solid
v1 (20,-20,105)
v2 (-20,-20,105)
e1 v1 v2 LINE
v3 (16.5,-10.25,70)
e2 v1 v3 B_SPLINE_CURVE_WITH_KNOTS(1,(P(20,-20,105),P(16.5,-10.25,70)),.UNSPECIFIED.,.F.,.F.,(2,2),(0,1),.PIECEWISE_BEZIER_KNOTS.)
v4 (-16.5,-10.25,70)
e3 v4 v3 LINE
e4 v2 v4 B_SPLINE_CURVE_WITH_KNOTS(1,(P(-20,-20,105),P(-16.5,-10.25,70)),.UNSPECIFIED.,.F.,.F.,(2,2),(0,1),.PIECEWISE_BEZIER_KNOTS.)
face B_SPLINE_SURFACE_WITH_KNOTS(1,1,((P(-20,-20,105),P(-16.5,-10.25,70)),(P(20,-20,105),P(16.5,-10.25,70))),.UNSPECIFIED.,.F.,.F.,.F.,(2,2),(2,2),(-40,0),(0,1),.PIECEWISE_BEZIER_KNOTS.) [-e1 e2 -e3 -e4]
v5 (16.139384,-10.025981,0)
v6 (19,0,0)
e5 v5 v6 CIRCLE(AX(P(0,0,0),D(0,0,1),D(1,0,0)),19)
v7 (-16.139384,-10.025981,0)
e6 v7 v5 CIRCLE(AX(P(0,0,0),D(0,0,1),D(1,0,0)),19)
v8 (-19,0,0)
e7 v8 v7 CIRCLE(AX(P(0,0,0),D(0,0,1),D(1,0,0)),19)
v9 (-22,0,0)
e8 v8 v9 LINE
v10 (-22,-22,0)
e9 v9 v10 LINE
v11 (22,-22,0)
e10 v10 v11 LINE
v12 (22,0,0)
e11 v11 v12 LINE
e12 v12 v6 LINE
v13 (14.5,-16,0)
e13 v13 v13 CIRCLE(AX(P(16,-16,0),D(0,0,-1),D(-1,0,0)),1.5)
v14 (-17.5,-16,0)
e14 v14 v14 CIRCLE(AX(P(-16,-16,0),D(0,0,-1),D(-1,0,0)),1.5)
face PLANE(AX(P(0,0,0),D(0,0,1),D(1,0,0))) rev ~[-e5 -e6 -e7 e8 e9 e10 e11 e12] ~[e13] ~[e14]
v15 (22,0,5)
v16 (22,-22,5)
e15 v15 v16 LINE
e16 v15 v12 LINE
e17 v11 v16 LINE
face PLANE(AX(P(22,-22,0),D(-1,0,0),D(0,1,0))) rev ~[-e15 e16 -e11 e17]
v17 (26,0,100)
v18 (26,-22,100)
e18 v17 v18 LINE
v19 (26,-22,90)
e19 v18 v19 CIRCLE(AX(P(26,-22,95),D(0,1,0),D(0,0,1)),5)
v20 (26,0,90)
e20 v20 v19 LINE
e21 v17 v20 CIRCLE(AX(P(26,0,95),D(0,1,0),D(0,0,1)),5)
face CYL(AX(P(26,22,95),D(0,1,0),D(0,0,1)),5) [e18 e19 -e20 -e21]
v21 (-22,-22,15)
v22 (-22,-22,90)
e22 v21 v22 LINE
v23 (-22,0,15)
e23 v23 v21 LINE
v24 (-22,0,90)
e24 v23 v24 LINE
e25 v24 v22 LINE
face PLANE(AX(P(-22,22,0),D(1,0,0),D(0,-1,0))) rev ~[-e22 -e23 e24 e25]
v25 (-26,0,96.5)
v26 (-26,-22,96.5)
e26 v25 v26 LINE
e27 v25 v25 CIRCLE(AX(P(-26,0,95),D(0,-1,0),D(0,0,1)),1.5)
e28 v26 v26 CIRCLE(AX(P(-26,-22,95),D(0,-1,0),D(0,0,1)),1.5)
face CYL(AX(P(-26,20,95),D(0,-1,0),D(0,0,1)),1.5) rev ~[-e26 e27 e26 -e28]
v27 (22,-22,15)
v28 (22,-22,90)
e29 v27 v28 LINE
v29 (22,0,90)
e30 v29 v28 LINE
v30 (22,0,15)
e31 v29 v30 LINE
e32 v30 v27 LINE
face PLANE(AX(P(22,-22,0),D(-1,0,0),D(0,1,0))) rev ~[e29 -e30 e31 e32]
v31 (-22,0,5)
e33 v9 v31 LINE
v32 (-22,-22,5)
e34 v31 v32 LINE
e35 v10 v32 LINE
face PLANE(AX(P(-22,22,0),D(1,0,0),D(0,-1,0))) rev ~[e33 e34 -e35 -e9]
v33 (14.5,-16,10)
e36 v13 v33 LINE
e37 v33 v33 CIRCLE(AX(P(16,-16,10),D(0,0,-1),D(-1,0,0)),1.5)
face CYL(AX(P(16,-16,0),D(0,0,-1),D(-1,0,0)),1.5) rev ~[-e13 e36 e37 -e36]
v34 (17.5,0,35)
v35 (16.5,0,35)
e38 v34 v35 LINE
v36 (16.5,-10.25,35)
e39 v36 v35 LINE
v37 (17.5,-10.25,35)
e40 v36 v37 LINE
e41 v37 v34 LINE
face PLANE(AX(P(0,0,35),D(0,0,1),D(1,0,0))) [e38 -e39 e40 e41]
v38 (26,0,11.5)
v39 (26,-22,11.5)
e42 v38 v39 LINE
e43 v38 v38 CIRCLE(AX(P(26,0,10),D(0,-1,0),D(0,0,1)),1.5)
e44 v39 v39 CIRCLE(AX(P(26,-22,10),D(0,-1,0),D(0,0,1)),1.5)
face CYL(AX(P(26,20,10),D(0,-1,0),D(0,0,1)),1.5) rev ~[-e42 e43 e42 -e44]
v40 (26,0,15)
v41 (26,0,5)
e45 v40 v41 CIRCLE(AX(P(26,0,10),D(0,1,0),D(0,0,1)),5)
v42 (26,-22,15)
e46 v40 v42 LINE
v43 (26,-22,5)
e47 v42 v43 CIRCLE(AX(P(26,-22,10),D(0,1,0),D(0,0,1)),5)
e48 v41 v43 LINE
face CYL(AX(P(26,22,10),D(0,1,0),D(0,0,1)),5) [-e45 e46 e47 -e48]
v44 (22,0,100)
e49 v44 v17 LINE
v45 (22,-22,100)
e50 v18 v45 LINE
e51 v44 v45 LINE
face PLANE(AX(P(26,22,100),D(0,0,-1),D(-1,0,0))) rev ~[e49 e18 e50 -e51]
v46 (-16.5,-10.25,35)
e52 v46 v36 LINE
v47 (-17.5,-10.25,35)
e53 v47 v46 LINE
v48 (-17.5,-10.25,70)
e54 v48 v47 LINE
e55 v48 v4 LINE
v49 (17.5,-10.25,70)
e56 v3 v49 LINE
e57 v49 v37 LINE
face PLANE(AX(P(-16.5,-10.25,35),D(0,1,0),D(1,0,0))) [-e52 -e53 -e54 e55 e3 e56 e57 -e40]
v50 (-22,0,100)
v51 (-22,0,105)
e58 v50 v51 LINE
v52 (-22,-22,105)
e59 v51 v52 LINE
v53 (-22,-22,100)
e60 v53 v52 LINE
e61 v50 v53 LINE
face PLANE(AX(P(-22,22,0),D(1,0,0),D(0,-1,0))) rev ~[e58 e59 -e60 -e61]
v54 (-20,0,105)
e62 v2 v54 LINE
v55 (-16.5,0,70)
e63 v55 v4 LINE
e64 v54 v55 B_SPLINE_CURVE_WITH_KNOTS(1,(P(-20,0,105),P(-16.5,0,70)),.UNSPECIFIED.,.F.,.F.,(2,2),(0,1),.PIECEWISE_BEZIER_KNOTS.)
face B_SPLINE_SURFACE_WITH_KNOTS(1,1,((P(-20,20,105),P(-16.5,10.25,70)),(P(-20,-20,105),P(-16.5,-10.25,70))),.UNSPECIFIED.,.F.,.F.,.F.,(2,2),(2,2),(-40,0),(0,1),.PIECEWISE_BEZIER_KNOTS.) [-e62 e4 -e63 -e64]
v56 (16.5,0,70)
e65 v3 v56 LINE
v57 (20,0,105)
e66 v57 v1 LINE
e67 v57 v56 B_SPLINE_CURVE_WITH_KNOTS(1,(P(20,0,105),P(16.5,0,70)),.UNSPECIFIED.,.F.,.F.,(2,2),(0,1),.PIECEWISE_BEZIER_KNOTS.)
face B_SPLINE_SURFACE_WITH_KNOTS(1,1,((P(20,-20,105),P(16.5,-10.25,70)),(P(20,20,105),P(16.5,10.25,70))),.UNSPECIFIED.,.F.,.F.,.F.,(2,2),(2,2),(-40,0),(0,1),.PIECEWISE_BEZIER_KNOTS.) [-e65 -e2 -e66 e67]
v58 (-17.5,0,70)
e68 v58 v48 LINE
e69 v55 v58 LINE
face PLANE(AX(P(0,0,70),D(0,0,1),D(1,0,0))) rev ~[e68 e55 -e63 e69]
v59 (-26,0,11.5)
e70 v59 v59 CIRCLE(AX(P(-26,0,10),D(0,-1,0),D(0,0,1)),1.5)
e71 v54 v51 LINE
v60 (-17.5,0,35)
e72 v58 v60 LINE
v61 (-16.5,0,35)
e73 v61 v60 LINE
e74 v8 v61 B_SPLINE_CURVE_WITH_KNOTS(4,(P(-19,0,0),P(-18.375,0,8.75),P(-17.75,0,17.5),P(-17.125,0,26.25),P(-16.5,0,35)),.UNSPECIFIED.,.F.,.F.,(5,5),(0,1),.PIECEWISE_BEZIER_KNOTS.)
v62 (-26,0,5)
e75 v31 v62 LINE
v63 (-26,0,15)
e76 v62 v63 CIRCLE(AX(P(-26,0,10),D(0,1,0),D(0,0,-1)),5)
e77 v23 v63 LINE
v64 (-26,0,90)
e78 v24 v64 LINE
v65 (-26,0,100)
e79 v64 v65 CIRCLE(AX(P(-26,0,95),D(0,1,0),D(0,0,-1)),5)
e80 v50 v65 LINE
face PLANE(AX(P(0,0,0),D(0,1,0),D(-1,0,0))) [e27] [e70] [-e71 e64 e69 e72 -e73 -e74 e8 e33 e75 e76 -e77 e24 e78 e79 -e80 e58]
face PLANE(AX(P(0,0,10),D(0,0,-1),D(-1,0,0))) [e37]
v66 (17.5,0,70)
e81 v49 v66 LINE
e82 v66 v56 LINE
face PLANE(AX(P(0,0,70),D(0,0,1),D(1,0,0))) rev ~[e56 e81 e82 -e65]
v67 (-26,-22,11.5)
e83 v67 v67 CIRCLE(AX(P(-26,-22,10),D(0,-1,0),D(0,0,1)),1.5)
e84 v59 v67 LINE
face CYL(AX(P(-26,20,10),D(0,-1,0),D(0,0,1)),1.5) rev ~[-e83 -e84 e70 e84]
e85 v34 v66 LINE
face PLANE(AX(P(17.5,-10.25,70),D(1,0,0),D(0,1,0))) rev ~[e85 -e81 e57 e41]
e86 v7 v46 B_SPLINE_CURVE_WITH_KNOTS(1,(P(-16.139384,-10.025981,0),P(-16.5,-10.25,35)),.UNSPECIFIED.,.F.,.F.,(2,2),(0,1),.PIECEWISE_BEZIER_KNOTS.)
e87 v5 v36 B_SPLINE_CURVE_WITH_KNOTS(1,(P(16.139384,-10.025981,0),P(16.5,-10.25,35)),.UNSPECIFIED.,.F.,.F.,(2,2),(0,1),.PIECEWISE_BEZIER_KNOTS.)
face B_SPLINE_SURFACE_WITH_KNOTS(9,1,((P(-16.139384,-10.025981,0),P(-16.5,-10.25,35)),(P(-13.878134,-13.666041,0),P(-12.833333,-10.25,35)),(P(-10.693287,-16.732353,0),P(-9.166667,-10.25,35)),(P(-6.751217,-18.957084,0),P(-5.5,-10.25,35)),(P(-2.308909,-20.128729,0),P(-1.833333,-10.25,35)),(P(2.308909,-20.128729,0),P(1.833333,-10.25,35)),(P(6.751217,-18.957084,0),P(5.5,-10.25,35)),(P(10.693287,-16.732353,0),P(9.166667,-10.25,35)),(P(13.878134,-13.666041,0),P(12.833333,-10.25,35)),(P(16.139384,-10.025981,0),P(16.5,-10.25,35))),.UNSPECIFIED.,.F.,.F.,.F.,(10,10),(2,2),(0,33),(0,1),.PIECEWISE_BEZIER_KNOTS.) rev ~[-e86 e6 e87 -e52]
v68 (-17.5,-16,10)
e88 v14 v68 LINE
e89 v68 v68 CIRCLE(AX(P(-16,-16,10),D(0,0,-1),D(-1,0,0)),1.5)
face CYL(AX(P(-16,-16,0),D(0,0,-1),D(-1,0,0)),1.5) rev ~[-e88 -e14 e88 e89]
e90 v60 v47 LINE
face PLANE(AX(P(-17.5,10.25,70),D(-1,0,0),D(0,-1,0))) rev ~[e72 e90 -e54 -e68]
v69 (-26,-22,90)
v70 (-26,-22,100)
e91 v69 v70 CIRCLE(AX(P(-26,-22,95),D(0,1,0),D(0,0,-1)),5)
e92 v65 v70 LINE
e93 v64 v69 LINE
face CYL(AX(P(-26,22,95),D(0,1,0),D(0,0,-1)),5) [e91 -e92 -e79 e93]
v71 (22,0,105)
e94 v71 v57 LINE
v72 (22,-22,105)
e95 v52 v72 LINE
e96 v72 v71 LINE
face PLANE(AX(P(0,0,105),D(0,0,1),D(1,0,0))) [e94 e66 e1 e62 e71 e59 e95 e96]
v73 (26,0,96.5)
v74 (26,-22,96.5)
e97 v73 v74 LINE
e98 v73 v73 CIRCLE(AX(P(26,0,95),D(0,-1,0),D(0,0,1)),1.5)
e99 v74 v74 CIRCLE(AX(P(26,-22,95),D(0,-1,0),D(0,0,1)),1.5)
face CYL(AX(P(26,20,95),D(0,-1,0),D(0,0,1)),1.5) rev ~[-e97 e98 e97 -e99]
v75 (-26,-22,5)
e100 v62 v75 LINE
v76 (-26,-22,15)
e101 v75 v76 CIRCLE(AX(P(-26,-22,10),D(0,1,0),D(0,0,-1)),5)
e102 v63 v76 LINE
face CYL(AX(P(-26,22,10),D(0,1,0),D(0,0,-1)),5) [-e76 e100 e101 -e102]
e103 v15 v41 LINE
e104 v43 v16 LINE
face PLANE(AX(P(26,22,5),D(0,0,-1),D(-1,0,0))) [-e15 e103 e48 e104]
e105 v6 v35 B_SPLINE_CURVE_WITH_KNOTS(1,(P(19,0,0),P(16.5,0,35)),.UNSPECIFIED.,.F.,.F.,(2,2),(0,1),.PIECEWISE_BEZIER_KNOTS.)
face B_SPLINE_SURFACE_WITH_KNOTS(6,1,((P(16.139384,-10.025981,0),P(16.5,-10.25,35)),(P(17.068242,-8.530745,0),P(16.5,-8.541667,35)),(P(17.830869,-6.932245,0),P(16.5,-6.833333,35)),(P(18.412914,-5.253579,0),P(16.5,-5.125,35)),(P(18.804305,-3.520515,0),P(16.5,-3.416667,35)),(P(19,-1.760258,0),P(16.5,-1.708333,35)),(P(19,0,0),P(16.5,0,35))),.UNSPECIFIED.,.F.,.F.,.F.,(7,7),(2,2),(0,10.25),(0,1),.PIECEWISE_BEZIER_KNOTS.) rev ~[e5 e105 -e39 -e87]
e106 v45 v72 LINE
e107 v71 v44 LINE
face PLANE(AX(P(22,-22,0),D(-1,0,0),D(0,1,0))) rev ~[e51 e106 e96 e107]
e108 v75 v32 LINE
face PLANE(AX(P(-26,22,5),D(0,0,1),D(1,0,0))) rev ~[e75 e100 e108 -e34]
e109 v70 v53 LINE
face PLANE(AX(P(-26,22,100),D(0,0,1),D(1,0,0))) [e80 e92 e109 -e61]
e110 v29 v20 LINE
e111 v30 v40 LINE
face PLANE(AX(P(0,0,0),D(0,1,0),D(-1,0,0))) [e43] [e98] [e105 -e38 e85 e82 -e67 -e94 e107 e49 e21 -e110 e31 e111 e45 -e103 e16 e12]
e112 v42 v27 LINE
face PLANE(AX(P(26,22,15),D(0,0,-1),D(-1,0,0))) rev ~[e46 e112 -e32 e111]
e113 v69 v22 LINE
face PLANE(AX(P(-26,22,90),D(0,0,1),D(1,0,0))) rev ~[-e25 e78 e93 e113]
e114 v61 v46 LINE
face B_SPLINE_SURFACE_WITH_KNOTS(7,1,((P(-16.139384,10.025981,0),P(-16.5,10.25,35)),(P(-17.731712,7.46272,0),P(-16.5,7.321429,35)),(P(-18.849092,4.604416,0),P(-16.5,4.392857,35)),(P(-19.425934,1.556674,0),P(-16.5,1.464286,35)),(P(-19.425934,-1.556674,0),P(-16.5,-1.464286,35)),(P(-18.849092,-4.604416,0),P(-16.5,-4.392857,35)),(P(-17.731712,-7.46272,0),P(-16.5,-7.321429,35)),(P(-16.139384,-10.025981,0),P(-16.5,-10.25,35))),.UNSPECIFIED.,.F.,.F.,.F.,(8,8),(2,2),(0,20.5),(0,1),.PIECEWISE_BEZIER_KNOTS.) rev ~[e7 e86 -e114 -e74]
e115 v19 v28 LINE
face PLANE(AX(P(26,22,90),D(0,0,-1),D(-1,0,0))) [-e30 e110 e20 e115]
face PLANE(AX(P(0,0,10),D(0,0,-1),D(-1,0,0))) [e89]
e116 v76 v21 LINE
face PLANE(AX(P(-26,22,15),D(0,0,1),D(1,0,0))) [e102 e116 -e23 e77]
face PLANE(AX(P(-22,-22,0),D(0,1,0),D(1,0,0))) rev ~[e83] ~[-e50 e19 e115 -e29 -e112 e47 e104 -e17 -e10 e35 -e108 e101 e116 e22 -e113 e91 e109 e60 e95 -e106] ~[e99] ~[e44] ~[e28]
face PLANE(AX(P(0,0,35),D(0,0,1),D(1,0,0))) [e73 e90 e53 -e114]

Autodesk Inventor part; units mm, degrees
ref_plane "YZ Plane" through (0, 0, 0) normal (1, 0, 0) x (0, 1, 0)
ref_plane "XZ Plane" through (0, 0, 0) normal (0, 1, 0) x (-1, 0, 0)
ref_plane "Płaszczyzna konstrukcyjna3" through (0, 0, 35) normal (0, 0, 1) x (1, 0, 0)
ref_plane "Płaszczyzna konstrukcyjna4" through (0, 0, 70) normal (0, 0, 1) x (1, 0, 0)
ref_plane "Płaszczyzna konstrukcyjna5" through (0, 0, 105) normal (0, 0, 1) x (1, 0, 0)
sketch "Szkic7" plane through (0, 0, 0) normal (0, 0, 1) x (1, 0, 0)
  circle A0 centre (0, 0) radius 19
  dimension "d41" = 38
sketch "Szkic9" plane through (0, 0, 35) normal (0, 0, 1) x (1, 0, 0)
  line L0 (16.5, 10.25) -> (-16.5, 10.25)
  line L1 (-16.5, 10.25) -> (-16.5, -10.25)
  line L2 (-16.5, -10.25) -> (16.5, -10.25)
  line L3 (16.5, -10.25) -> (16.5, 10.25)
  line L4 (16.5, 10.25) -> (-16.5, -10.25) construction
  line L5 (-16.5, 10.25) -> (16.5, -10.25) construction
  point P0 (0, 0)
  dimension "d42" = 33
  dimension "d43" = 20.5
sketch "Szkic10" plane through (0, 0, 70) normal (0, 0, 1) x (1, 0, 0)
  line L0 (16.5, 10.25) -> (-16.5, 10.25) projected
  line L1 (-16.5, 10.25) -> (-16.5, -10.25) projected
  line L2 (-16.5, -10.25) -> (16.5, -10.25) projected
  line L3 (16.5, -10.25) -> (16.5, 10.25) projected
  point P0 (0, 0)
sketch "Szkic11" plane through (0, 0, 105) normal (0, 0, 1) x (1, 0, 0)
  line L0 (20, -20) -> (-20, -20)
  line L1 (-20, -20) -> (-20, 20)
  line L2 (-20, 20) -> (20, 20)
  line L3 (20, 20) -> (20, -20)
  line L4 (20, -20) -> (-20, 20) construction
  line L5 (-20, -20) -> (20, 20) construction
  point P0 (0, 0)
  dimension "d44" = 40
  dimension "d45" = 40
sketch "Szkic12" plane through (0, 0, 0) normal (0, 0, 1) x (1, 0, 0)
  line L0 (-22, -22) -> (22, -22)
  line L1 (22, -22) -> (22, 22)
  line L2 (22, 22) -> (-22, 22)
  line L3 (-22, 22) -> (-22, -22)
  line L4 (-22, -22) -> (22, 22) construction
  line L5 (22, -22) -> (-22, 22) construction
  point P0 (0, 0)
  dimension "d46" = 44
  dimension "d47" = 44
extrude "Wyciągnięcie proste1" add sketch "Szkic12" along normal blind 105
extrude "Wyciągnięcie proste2" cut sketch "Szkic9" along normal blind 35
loft "Wyciągnięcie złożone1" cut profiles "Szkic7" section 2 edges at (-16.5, 0, 35) (0, -10.25, 35) (16.5, 0, 35) (0, 10.25, 35)
loft "Wyciągnięcie złożone2" cut profiles "Szkic11" section 2 edges at (-16.5, 0, 70) (0, 10.25, 70) (16.5, 0, 70) (0, -10.25, 70)
sketch "Szkic13" plane through (0, 0, 70) normal (0, 0, 1) x (1, 0, 0)
  line L0 (-17.5, -10.25) -> (17.5, -10.25)
  line L1 (17.5, -10.25) -> (17.5, 10.25)
  line L2 (17.5, 10.25) -> (-17.5, 10.25)
  line L3 (-17.5, 10.25) -> (-17.5, -10.25)
  line L4 (-17.5, -10.25) -> (17.5, 10.25) construction
  line L5 (17.5, -10.25) -> (-17.5, 10.25) construction
  point P0 (0, 0)
  dimension "d60" = 35
  dimension "d61" = 20.5
extrude "Wyciągnięcie proste3" cut sketch "Szkic13" against normal blind 35
sketch "Szkic14" plane through (-22, 22, 0) normal (0, 1, 0) x (1, 0, 0)
  point P0 (22, 0)
sketch "Szkic15" plane through (-16.2734, 10.25, 35) normal (0, -1, 0) x (1, 0, 0)
  line L0 (32.5467, 0) -> (0, 0) construction
  line L1 (16.2734, 0) -> (16.2734, -12) construction
  circle A0 centre (16.2734, -12) radius 4
  point P0 (16.2734, -35)
  dimension "d64" = 12
  dimension "d65" = 8
extrude "Wyciągnięcie proste4" cut sketch "Szkic15" against normal through all
sketch "Szkic16" plane through (0, 0, 0) normal (0, 0, -1) x (-1, 0, 0)
  line L0 (-16, -16) -> (16, -16) construction
  line L1 (16, -16) -> (16, 16) construction
  line L2 (16, 16) -> (-16, 16) construction
  line L3 (-16, 16) -> (-16, -16) construction
  line L4 (-16, -16) -> (16, 16) construction
  line L5 (16, -16) -> (-16, 16) construction
  circle A0 centre (-16, 16) radius 1.5
  circle A1 centre (-16, -16) radius 1.5
  circle A2 centre (16, -16) radius 1.5
  circle A3 centre (16, 16) radius 1.5
  point P0 (0, 0)
  dimension "d68" = 32
  dimension "d69" = 32
  dimension "d70" = 3
extrude "Wyciągnięcie proste5" cut sketch "Szkic16" against normal blind 10
sketch "Szkic17" plane through (0, 0, 0) normal (0, 1, 0) x (-1, 0, 0)
  line L0 (-35.497, 120.9522) -> (40.1676, 120.9522)
  line L1 (40.1676, 120.9522) -> (40.1676, -13.5628)
  line L2 (40.1676, -13.5628) -> (-35.497, -13.5628)
  line L3 (-35.497, -13.5628) -> (-35.497, 120.9522)
  point P0 (0, 0)
sketch "Szkic18" plane through (-22, 22, 0) normal (0, 1, 0) x (1, 0, 0)
  point P0 (22, 0)
sketch "Szkic19" plane through (-22, 22, 0) normal (0, 1, 0) x (1, 0, 0)
  line L0 (44, 0) -> (44, -105) projected
  line L1 (44, -105) -> (44, -95) construction
  line L2 (44, -95) -> (48, -95) construction
  arc A0 (48, -100) -> (48, -90) centre (48, -95) ccw
  line L3 (48, -100) -> (44, -100)
  line L4 (48, -90) -> (44, -90)
  line L5 (44, -100) -> (44, -90)
  line L6 (22, -110.411) -> (22, 7.1772) construction
  line L7 (-9.1147, -52.5) -> (56.3126, -52.5) construction
  line L8 (44, -10) -> (48, -10) construction
  arc A1 (48, -15) -> (48, -5) centre (48, -10) ccw
  line L9 (48, -5) -> (44, -5)
  line L10 (48, -15) -> (44, -15)
  line L11 (44, -5) -> (44, -15)
  line L12 (0, 0) -> (0, -105)
  line L13 (0, -105) -> (0, -95) construction
  line L14 (0, -95) -> (-4, -95) construction
  arc A2 (-4, -90) -> (-4, -100) centre (-4, -95) ccw
  line L15 (-4, -100) -> (0, -100)
  line L16 (-4, -90) -> (0, -90)
  line L17 (0, -100) -> (0, -90)
  line L18 (0, -10) -> (-4, -10) construction
  arc A3 (-4, -5) -> (-4, -15) centre (-4, -10) ccw
  line L19 (-4, -5) -> (0, -5)
  line L20 (-4, -15) -> (0, -15)
  line L21 (0, -5) -> (0, -15)
  point P0 (22, 0)
  dimension "d73" = 10
  dimension "d74" = 4
  dimension "d75" = 10
extrude "Wyciągnięcie proste6" add sketch "Szkic19" against normal up to surface (44 mm away)
sketch "Szkic20" plane through (-22, 22, 0) normal (0, 1, 0) x (1, 0, 0)
  arc A0 (48, -15) -> (48, -5) centre (48, -10) ccw projected
  arc A1 (-4, -5) -> (-4, -15) centre (-4, -10) ccw projected
  arc A2 (-4, -90) -> (-4, -100) centre (-4, -95) ccw projected
  arc A3 (48, -100) -> (48, -90) centre (48, -95) ccw projected
  point P0 (22, 0)
hole "Otwór1" at (26, 22, 10) at (-26, 22, 10) at (26, 22, 95) at (-26, 22, 95) direction (0, -1, 0) diameter 3 end through all counterbore diameter 5 counterbore depth 2
extrude "Wyciągnięcie proste7" cut sketch "Szkic17" along normal up to surface (22 mm away)
properties part number "heater_case_bottom"
